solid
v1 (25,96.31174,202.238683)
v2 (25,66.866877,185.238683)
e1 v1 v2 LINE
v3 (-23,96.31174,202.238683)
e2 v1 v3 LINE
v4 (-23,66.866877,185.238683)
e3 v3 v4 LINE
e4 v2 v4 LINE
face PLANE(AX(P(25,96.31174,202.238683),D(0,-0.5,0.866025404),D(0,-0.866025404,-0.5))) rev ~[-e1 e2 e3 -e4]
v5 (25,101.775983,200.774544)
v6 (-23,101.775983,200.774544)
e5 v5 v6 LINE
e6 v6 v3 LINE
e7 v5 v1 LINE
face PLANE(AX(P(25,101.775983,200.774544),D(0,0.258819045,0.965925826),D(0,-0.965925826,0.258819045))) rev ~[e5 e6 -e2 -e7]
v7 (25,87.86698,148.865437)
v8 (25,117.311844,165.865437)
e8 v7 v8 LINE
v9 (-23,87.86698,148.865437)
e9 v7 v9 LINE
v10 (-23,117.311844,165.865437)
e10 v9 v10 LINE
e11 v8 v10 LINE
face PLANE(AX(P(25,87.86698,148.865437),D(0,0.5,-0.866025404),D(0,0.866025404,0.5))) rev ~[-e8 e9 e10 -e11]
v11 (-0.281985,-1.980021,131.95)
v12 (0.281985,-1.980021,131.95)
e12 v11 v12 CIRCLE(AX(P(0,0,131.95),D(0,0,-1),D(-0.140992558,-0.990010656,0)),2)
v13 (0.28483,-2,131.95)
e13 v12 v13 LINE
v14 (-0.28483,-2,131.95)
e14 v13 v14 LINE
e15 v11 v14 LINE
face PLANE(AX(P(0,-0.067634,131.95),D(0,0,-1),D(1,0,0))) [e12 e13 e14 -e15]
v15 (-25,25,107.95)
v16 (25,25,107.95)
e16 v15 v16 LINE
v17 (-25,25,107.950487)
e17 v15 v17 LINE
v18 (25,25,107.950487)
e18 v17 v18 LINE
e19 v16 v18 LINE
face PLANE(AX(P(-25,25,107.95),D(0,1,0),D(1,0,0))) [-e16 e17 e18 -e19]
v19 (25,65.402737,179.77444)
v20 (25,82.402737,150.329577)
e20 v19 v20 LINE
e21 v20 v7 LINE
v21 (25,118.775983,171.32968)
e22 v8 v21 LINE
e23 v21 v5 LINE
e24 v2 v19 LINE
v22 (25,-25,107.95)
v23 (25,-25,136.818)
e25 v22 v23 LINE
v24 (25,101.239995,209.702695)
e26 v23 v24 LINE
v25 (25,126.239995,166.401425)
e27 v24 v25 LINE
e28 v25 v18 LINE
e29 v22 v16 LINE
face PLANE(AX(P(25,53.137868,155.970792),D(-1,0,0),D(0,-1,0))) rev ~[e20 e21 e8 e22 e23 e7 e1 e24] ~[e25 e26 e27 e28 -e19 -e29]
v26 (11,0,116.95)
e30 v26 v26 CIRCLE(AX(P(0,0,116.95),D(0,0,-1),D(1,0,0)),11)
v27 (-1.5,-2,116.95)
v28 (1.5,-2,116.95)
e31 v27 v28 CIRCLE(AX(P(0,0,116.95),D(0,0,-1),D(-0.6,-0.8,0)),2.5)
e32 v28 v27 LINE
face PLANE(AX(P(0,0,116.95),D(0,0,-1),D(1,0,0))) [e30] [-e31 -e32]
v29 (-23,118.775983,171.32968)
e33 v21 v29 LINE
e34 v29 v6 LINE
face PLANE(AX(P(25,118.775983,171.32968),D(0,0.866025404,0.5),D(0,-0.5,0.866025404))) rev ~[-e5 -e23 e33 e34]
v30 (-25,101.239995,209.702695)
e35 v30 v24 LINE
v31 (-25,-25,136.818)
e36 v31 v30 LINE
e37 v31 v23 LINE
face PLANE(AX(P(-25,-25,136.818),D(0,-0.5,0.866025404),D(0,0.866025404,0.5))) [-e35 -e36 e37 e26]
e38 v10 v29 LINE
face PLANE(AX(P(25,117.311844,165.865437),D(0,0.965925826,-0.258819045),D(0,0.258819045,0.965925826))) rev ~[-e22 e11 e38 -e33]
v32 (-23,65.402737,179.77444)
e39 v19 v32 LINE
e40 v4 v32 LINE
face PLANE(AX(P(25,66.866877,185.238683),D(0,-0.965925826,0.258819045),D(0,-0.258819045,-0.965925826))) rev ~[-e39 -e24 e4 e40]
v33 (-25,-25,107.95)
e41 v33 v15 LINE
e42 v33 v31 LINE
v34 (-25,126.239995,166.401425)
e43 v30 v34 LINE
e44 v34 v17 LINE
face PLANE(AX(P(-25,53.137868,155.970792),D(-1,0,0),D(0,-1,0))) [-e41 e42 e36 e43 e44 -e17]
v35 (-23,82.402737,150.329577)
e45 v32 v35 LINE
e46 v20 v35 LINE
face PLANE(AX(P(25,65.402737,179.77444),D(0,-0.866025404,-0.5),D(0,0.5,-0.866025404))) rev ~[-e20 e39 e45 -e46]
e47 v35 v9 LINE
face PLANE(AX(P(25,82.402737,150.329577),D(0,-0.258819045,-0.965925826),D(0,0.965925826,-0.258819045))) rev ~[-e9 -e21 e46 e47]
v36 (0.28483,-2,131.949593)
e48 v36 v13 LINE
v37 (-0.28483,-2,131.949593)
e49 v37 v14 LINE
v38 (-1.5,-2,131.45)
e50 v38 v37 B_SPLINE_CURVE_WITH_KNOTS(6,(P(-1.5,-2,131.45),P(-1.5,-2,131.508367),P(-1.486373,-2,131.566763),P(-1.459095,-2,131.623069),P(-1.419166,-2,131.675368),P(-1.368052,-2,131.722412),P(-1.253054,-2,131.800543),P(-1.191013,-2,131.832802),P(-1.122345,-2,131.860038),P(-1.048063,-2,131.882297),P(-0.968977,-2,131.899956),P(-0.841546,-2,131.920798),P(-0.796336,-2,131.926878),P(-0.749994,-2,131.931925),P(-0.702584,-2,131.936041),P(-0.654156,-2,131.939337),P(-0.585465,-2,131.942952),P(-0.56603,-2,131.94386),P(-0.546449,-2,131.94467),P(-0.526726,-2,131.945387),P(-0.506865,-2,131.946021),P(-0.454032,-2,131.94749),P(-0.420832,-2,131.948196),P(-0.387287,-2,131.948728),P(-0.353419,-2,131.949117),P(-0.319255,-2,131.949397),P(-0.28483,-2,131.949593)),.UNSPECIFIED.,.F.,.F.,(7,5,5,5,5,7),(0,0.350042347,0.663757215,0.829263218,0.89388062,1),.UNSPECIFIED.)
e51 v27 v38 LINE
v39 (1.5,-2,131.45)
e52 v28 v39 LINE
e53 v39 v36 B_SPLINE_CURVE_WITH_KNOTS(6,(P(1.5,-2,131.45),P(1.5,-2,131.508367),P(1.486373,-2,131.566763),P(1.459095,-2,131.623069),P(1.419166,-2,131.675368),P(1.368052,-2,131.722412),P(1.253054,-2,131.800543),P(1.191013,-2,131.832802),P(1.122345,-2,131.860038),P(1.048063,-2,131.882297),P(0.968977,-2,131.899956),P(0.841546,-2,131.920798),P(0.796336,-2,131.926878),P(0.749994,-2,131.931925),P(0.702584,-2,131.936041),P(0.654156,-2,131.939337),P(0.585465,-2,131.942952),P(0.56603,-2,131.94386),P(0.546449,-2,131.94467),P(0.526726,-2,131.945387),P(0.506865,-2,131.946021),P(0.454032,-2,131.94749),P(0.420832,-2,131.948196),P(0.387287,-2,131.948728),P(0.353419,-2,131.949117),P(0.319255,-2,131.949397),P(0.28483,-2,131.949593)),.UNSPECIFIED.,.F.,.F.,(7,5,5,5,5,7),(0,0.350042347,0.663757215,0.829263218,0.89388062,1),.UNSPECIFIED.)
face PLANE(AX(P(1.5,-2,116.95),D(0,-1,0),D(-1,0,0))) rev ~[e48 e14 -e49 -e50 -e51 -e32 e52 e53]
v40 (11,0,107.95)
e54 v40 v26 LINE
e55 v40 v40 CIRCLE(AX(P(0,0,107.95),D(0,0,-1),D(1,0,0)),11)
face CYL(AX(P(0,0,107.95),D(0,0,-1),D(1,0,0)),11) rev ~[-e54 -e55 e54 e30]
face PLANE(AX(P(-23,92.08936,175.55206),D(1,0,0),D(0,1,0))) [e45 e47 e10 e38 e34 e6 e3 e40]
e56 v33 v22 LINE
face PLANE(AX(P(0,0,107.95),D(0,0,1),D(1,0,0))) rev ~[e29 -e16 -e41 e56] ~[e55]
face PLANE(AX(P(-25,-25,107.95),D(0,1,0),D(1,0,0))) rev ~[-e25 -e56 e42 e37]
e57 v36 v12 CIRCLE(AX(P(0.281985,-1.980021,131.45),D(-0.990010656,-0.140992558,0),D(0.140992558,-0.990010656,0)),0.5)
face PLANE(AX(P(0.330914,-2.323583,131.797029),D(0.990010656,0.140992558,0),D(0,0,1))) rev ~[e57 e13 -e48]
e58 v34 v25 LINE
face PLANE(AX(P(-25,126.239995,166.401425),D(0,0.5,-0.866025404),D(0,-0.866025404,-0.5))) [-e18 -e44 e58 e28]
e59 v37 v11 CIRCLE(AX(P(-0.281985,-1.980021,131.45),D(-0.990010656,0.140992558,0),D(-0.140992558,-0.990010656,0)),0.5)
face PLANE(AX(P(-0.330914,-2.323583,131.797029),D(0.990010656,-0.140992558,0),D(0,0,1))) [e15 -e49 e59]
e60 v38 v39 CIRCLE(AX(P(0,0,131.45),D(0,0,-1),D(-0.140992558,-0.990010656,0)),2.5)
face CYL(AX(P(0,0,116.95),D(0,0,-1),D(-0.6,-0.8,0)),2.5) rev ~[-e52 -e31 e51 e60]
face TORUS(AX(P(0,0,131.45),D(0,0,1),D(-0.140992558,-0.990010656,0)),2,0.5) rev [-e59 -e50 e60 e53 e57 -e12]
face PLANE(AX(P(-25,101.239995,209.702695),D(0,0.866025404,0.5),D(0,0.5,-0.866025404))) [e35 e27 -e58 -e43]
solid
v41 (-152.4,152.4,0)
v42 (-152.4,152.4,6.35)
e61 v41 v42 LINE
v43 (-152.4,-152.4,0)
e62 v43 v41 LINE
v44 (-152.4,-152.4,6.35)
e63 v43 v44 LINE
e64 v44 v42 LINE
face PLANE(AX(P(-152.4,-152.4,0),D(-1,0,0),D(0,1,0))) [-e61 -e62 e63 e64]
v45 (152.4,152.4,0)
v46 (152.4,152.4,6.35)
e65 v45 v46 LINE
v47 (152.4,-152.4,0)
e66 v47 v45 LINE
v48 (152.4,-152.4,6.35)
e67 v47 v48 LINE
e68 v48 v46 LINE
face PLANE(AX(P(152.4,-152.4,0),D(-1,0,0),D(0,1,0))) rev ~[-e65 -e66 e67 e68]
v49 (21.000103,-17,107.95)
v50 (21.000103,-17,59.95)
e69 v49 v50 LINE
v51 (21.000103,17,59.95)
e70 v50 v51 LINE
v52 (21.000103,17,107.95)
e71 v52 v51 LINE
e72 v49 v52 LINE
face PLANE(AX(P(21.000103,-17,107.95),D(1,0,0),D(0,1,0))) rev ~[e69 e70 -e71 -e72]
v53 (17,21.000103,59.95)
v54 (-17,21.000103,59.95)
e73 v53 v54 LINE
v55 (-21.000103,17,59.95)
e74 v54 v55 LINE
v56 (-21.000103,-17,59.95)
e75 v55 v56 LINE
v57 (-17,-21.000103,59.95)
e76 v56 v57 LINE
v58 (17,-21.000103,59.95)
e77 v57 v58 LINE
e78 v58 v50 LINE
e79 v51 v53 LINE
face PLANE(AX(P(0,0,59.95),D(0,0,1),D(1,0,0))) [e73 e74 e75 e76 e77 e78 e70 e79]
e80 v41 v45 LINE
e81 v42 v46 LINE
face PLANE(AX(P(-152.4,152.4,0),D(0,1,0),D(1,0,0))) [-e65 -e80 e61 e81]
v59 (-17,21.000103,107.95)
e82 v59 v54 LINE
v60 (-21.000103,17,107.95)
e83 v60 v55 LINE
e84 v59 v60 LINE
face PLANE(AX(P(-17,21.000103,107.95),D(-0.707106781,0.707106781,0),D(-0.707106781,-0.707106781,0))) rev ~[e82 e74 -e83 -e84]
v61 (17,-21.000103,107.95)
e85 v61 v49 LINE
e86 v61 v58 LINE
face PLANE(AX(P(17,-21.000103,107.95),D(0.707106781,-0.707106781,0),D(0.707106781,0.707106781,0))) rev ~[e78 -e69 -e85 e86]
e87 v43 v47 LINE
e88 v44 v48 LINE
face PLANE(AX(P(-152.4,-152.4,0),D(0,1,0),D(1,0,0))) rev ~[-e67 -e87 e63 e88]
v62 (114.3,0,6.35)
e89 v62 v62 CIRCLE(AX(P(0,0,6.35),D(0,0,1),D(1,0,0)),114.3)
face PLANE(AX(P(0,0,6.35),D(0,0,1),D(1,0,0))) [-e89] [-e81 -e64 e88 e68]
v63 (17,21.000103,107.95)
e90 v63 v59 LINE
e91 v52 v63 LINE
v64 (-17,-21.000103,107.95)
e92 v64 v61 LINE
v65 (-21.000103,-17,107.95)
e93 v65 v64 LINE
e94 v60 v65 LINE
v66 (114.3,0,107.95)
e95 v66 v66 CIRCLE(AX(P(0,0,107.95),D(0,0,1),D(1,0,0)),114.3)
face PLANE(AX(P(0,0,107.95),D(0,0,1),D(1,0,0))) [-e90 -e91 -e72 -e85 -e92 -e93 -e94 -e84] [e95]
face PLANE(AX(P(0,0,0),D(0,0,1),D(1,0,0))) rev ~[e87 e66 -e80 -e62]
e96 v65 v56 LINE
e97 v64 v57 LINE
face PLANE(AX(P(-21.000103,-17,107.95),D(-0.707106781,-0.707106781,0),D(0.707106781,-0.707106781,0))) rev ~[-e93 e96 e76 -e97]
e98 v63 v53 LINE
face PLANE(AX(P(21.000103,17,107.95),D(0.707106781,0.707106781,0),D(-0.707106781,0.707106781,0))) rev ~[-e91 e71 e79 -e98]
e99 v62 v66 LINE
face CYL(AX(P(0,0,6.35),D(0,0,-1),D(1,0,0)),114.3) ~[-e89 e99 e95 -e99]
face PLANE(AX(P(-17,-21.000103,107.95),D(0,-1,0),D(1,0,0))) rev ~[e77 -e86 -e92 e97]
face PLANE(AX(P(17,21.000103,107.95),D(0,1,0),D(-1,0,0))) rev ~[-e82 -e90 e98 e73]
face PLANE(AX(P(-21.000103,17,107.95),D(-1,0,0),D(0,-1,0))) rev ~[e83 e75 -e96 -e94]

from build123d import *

# Parameters (mm, degrees)
F0_W         = 304.8
F0_H         = 304.8
F1_DEPTH     = 6.35
F2_R         = 114.3
F3_DEPTH     = 101.6
F4_W         = 50
F4_H         = 50
F5_DEPTH     = 28.868
F7_DEPTH     = 50
F9_DEPTH     = 48
F11_DEPTH    = 48
F12_R        = 11
F13_DEPTH    = 9
F15_DEPTH    = 15
F16_T2_ANGLE = 343.7894292622


# Not quite as in the source:
# - a fillet or chamfer that OpenCascade refuses, or shapes differently, is made with other operations: its cross-section is extruded or revolved along the edge and cut away or added


with BuildPart() as f1:
    # F0 (on Top) → F1 (new body)
    with BuildSketch(Plane.XY):
        Rectangle(F0_W, F0_H)
    extrude(amount=F1_DEPTH)

    # F2 (on face) → F3 (join)
    with BuildSketch(Plane.XY.offset(6.35)):
        Circle(F2_R)
    extrude(amount=F3_DEPTH)

    # F10 (on face) → F11 (cut)
    with BuildSketch(Plane.XY.offset(107.95)):
        Polygon((-21.0001030612, 17), (-21.0001030612, -17), (-17, -21.0001030612), (17, -21.0001030612), (21.0001030612, -17), (21.0001030612, 17), (17, 21.0001030612), (-17, 21.0001030612), align=None)
    extrude(amount=-F11_DEPTH, mode=Mode.SUBTRACT)


with BuildPart() as f5:
    # F4 (on face) → F5 (new body)
    with BuildSketch(Plane.XY.offset(107.95)):
        Rectangle(F4_W, F4_H)
    extrude(amount=F5_DEPTH)

    # F6 (on face) → F7 (join)
    with BuildSketch(Plane(origin=(-25, 0, 0), x_dir=(0, -1, 0), z_dir=(-1, 0, 0))):
        Polygon((-25, 136.818), (25, 136.818), (-101.2399952248, 209.7026952255), (-126.2399952248, 166.4014250363), (-25, 107.9504865405), align=None)
    extrude(amount=-F7_DEPTH)

    # F8 (on face) → F9 (cut)
    with BuildSketch(Plane.YZ.offset(25)):
        Polygon((96.3117404639, 202.238682864), (66.8668767352, 185.238682864), (65.4027373971, 179.7744404647), (82.4027373971, 150.329576736), (87.8669797964, 148.8654373978), (117.3118435251, 165.8654373978), (118.7759828632, 171.3296797972), (101.7759828632, 200.7745435258), align=None)
    extrude(amount=-F9_DEPTH, mode=Mode.SUBTRACT)

    # F12 (on face) → F13 (cut)
    with BuildSketch(Plane(origin=(0, 0, 107.95), x_dir=(1, 0, 0), z_dir=(0, 0, -1))):
        Circle(F12_R)
    extrude(amount=-F13_DEPTH, mode=Mode.SUBTRACT)

    # F14 (on face) → F15 (cut)
    with BuildSketch(Plane(origin=(0, 0, 116.95), x_dir=(1, 0, 0), z_dir=(0, 0, -1))):
        with BuildLine():
            Line((1.5, 2), (-1.5, 2))
            ThreePointArc((-1.5, 2), (0, -2.5), (1.5, 2))
        make_face()
    extrude(amount=-F15_DEPTH, mode=Mode.SUBTRACT)

    # F16: fillet of radius 0.5 on 1 edges, made by hand

    # F16_s1 → F16_t2 (revolve)
    with BuildSketch(Plane(origin=(0, 0, 0), x_dir=(0, 0, 1), z_dir=(0.9900106558, -0.1409925581, 0))):
        with BuildLine():
            ThreePointArc((131.45, 2.5), (131.8035533906, 2.3535533906), (131.95, 2))
            Line((131.95, 2), (131.95, 2.5))
            Line((131.95, 2.5), (131.45, 2.5))
        make_face()
    revolve(axis=Axis((0, 0, 131.95), (0, 0, -1)), revolution_arc=F16_T2_ANGLE)


solid = Compound([f1.part, f5.part])
